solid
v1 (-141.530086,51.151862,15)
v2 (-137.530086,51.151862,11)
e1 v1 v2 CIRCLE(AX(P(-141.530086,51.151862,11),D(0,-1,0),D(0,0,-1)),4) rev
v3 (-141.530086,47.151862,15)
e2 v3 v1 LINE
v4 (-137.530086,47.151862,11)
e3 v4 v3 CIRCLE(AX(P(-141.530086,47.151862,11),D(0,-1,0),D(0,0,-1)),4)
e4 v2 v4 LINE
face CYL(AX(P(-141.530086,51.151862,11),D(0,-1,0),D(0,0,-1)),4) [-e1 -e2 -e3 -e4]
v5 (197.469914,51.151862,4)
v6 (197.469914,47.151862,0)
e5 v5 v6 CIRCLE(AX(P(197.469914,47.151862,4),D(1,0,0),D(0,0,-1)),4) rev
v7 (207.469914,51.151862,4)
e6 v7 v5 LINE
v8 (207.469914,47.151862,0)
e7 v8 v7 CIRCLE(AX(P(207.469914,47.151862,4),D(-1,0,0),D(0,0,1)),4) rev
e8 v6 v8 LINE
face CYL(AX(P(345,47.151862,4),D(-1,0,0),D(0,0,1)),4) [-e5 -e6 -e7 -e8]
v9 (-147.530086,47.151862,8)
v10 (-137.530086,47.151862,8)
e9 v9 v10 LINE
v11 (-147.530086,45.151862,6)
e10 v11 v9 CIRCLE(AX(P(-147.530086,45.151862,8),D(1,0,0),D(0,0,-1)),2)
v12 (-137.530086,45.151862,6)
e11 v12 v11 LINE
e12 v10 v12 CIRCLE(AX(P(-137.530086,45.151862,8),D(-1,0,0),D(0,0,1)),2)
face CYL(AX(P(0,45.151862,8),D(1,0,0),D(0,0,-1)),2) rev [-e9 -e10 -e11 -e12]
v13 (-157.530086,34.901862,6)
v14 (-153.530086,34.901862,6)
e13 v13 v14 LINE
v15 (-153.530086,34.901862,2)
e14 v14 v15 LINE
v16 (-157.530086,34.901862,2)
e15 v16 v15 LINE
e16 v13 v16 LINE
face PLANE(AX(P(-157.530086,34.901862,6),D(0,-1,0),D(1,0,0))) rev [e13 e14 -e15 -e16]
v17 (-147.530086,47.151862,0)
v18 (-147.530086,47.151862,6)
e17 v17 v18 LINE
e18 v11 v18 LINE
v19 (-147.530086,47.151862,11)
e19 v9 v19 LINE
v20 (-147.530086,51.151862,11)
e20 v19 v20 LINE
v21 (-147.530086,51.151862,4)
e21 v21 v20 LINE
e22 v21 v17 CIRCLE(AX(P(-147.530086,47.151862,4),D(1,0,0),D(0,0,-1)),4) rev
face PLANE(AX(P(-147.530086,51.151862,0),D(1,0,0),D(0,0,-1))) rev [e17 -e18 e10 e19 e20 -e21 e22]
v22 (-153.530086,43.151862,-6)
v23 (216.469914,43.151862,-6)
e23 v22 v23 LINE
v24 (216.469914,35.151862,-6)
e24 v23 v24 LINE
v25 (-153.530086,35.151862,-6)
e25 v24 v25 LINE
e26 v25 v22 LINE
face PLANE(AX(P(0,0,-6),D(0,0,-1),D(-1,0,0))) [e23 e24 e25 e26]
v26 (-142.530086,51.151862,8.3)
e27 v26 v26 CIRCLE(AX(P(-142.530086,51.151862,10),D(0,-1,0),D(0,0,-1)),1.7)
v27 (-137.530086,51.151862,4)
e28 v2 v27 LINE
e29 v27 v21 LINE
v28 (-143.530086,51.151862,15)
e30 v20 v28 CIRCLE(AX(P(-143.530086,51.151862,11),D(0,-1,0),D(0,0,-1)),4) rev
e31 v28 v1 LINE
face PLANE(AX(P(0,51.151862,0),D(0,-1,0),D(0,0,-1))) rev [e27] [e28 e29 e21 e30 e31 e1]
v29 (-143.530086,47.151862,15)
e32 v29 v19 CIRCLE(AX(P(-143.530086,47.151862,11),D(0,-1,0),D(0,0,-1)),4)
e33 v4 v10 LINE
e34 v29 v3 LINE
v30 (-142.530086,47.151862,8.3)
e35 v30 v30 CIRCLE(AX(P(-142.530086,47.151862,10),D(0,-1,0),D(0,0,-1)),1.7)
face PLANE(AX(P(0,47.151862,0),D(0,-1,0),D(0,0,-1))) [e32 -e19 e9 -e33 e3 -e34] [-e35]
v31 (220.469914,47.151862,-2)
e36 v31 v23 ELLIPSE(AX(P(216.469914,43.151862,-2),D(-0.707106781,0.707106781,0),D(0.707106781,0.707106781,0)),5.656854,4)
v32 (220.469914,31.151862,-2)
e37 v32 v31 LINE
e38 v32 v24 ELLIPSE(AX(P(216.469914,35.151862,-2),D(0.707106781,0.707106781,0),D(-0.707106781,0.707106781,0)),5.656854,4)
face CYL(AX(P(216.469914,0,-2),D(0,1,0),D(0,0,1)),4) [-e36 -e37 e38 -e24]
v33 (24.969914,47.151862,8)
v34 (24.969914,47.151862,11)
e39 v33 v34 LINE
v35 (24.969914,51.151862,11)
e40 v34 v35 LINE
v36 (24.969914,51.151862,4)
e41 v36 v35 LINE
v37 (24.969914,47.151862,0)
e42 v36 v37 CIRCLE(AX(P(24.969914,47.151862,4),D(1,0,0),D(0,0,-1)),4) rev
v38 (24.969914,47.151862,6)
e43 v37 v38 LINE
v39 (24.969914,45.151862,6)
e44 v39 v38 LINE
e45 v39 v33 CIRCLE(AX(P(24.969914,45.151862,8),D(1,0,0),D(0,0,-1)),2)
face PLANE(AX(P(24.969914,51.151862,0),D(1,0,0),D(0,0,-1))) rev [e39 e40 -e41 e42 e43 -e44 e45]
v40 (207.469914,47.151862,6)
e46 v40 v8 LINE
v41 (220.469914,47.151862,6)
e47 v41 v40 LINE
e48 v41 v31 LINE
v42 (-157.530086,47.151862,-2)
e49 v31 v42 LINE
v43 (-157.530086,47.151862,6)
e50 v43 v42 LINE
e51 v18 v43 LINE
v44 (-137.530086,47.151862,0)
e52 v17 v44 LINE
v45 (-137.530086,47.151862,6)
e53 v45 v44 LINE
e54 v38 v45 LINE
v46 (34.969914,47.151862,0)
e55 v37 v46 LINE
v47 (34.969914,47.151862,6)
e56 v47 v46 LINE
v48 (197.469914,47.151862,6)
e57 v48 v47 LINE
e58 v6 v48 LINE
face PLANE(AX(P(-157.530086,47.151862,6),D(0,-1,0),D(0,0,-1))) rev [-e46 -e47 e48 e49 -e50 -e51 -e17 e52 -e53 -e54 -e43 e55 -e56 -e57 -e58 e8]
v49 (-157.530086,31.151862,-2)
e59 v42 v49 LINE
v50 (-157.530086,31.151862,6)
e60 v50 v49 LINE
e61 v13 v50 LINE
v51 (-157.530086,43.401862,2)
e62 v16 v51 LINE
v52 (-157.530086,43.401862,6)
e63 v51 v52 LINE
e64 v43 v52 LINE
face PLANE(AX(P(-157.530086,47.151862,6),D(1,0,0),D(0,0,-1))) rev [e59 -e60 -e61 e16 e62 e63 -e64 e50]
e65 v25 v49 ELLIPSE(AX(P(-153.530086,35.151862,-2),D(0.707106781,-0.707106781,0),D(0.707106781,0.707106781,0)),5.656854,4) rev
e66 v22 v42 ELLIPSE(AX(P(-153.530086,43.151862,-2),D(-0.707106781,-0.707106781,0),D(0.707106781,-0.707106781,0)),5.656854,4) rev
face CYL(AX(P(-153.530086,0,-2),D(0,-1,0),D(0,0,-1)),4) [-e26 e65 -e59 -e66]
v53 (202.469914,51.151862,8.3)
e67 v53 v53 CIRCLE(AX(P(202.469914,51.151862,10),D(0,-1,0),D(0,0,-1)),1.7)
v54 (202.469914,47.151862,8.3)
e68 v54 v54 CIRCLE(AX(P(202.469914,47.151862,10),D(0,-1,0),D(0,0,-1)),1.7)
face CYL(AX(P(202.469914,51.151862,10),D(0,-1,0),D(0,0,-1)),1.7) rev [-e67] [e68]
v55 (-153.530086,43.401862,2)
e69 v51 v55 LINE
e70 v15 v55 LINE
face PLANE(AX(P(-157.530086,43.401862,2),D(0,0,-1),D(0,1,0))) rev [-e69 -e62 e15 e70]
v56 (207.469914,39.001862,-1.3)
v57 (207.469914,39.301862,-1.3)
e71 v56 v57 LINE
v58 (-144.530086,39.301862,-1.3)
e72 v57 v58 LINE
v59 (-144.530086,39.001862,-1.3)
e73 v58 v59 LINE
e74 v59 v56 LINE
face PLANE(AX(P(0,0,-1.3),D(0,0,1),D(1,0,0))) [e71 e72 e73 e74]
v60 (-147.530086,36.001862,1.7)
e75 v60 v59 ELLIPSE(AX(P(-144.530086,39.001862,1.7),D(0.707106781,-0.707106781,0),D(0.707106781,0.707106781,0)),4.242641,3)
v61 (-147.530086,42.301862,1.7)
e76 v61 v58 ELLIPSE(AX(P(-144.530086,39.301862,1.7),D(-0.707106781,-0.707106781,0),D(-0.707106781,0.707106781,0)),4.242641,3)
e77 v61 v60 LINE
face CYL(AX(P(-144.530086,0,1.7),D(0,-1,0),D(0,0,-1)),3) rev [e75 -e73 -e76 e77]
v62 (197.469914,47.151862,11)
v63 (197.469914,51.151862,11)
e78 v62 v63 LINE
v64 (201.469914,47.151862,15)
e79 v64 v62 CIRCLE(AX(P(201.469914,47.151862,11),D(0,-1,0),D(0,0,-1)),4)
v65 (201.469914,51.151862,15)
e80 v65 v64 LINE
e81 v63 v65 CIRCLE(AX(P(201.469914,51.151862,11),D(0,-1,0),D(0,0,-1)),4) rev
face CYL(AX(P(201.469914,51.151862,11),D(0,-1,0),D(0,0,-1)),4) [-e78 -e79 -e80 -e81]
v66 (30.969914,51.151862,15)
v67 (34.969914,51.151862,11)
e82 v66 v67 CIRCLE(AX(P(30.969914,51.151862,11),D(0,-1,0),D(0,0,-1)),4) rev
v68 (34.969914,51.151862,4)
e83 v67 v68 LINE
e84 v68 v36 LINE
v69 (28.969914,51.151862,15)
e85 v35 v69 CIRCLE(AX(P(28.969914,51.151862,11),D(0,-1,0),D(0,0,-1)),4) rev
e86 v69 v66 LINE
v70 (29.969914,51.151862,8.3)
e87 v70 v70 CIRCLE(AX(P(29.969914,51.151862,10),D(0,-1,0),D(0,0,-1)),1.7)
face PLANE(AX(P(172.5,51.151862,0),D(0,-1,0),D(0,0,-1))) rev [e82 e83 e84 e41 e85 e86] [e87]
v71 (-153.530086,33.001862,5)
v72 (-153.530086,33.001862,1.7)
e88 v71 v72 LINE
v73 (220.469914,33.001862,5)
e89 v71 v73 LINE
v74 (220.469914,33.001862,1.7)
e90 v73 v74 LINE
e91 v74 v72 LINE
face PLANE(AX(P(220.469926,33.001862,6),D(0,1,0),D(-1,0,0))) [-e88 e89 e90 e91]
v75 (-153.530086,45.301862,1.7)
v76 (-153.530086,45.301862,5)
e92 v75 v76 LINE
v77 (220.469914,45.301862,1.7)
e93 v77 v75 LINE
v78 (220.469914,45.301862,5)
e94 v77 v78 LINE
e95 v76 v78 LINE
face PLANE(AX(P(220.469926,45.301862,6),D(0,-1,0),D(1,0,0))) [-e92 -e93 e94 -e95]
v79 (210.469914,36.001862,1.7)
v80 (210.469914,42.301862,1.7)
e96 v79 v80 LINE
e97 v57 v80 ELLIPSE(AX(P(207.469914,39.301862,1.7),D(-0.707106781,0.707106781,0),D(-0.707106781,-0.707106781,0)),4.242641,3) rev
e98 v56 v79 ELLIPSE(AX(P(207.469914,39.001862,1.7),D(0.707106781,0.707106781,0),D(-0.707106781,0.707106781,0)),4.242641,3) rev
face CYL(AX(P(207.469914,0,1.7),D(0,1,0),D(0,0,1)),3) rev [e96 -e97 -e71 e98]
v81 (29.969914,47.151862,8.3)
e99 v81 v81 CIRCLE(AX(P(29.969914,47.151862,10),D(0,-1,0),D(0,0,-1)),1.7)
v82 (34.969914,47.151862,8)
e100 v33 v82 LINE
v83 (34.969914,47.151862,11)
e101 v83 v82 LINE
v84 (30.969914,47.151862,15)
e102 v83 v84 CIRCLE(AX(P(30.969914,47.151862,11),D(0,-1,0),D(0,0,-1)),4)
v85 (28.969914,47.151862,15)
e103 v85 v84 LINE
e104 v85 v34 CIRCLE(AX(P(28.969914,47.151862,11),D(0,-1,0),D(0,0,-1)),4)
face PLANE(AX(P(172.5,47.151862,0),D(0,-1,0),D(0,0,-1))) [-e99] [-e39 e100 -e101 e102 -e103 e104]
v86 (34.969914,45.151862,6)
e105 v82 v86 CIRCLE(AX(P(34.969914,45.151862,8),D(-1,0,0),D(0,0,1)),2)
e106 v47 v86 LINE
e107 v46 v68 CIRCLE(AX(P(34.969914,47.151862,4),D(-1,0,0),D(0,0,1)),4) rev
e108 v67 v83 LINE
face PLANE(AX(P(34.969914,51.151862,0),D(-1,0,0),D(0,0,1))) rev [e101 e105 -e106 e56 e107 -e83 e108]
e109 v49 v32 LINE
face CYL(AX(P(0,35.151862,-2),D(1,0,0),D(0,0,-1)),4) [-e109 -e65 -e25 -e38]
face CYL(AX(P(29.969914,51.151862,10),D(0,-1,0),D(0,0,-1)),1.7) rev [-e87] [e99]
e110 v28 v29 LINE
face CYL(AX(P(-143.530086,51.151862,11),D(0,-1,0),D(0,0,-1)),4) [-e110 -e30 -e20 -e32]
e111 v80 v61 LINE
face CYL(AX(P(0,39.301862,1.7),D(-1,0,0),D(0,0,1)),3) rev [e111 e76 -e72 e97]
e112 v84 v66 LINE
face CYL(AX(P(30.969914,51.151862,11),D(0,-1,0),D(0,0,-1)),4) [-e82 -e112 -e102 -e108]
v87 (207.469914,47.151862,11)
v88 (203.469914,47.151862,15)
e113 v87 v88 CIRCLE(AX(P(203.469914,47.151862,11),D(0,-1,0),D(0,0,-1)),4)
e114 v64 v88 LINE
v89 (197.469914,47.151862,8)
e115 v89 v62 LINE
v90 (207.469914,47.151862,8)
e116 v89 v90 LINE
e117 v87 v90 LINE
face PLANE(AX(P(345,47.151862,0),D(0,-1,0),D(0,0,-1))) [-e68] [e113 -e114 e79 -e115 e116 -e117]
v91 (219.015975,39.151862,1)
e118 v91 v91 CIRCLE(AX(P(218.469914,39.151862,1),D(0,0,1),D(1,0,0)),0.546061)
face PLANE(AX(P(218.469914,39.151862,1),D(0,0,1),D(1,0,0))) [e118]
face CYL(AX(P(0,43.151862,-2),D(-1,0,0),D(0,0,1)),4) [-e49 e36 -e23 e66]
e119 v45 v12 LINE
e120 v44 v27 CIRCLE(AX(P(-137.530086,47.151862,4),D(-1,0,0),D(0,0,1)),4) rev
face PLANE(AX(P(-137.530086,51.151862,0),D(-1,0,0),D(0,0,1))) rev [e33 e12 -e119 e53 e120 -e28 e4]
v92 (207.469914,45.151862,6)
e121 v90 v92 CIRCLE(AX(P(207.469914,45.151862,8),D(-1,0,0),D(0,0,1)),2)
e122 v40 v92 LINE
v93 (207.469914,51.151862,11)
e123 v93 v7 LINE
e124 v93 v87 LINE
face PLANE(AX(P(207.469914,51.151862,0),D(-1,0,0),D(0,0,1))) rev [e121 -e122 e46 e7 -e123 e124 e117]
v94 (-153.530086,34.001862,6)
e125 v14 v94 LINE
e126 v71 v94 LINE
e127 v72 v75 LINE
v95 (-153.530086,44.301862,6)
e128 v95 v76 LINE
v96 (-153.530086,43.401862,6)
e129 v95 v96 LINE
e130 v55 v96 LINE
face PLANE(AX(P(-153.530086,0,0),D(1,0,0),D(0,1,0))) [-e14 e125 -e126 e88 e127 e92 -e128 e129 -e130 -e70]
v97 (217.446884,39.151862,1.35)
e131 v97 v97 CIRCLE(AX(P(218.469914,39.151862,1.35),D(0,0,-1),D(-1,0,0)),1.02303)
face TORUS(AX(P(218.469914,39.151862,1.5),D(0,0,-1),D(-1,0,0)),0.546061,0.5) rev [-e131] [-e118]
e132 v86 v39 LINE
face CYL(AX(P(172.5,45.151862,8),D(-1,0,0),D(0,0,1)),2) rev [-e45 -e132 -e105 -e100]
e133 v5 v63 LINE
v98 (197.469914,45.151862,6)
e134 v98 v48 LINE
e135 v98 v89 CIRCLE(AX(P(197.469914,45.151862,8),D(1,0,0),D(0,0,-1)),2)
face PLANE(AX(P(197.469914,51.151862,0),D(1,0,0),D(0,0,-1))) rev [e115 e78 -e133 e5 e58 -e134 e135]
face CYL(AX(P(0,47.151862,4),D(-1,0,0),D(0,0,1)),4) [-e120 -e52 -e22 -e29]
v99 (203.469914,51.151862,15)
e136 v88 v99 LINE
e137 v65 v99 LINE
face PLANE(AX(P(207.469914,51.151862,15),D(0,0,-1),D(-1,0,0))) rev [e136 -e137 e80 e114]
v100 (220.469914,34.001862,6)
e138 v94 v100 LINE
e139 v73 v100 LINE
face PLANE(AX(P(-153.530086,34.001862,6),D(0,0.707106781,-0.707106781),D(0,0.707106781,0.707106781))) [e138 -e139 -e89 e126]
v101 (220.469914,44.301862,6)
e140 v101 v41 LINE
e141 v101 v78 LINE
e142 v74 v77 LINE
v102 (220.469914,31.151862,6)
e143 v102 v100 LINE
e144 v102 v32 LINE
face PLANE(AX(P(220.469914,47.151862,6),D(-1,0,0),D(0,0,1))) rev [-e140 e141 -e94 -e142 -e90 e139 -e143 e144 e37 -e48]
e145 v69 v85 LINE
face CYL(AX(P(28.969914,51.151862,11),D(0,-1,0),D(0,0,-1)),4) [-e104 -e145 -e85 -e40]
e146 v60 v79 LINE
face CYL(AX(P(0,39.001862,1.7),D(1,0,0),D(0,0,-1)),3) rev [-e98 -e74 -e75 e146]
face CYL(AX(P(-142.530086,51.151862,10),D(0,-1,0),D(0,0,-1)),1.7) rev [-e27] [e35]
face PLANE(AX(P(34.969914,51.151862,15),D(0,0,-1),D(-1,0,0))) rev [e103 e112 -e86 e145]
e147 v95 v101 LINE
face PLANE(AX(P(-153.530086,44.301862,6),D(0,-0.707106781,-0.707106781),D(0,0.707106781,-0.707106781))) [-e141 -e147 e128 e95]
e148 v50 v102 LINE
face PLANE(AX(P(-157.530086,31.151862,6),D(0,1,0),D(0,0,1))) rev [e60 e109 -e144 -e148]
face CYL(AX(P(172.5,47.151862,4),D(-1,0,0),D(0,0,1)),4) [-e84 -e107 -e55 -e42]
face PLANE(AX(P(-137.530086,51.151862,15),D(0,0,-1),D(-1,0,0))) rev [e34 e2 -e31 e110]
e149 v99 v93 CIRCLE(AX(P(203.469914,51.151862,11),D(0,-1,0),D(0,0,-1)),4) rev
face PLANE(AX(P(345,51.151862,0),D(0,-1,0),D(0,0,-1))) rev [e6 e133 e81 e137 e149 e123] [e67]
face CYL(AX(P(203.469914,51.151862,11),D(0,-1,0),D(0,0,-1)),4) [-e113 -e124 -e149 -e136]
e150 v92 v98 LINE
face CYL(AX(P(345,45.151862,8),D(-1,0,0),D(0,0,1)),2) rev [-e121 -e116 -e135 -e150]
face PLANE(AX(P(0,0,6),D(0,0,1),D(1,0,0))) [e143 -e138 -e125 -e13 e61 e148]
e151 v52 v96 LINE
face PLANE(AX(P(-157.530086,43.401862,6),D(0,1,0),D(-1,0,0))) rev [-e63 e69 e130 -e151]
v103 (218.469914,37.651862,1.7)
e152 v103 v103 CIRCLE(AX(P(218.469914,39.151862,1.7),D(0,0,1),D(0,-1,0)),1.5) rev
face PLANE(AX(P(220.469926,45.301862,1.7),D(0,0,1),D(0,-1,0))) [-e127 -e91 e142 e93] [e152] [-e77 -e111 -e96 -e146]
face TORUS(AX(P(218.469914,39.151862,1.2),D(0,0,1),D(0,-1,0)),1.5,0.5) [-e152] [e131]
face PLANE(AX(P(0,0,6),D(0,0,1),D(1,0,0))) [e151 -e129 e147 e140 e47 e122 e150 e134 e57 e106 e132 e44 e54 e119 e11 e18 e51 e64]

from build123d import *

# Parameters (mm, degrees)
SKETCH1_W               = 378
SKETCH1_H               = 16
BOSS_EXTRUDE1_DEPTH     = 6
CUT_EXTRUDE1_DEPTH      = 381.976768496
CUT_EXTRUDE1_DEPTH_BACK = 374
SKETCH3_W               = 4.3
SKETCH3_H               = 12.3
BOSS_EXTRUDE2_DEPTH     = 374
BOSS_EXTRUDE3_DEPTH     = 374
SKETCH6_W               = 4
SKETCH6_H               = 8.5
CUT_EXTRUDE2_DEPTH      = 378.00835287
SKETCH13_W              = 10
SKETCH13_H              = 15
BOSS_EXTRUDE5_DEPTH     = 4
FILLET10_R              = 4
SKETCH14_R              = 1.7
CUT_EXTRUDE5_DEPTH      = 4
FILLET11_R              = 4
FILLET12_R              = 4
LPATTERN3_COUNT         = 3
LPATTERN3_PITCH         = 172.5
LPATTERN4_COUNT         = 3
LPATTERN4_PITCH         = 172.5
FILLET13_R              = 4
FILLET14_R              = 4
FILLET16_R              = 4
FILLET17_R              = 4
FILLET18_R              = 4
FILLET19_R              = 4
FILLET20_R              = 2
FILLET21_R              = 2
FILLET22_R              = 2
SKETCH17_W              = 378
SKETCH17_H              = 16
BOSS_EXTRUDE6_DEPTH     = 6
FILLET25_R              = 4
SKETCH18_R              = 1
CUT_EXTRUDE6_DEPTH      = 0.7
FILLET26_R              = 0.5
FILLET27_R              = 0.5
SKETCH19_W              = 358
SKETCH19_H              = 6.3
CUT_EXTRUDE7_DEPTH      = 3
FILLET28_R              = 3


with BuildPart() as part:
    # Sketch1 → Boss-Extrude1 (new body)
    with BuildSketch(Plane.XY):
        with Locations((31.46991404, 39.151862464)):
            Rectangle(SKETCH1_W, SKETCH1_H)
    extrude(amount=BOSS_EXTRUDE1_DEPTH)

    # Sketch3 → Cut-Extrude1 (cut, two sides: drawn at the far end of the back side and taken through both)
    with BuildSketch(Plane(origin=(220.46991404, 0, 0), x_dir=(0, 0, -1), z_dir=(1, 0, 0)).offset(-CUT_EXTRUDE1_DEPTH_BACK)):
        with Locations((-3.85, 39.151862464)):
            Rectangle(SKETCH3_W, SKETCH3_H)
    extrude(amount=CUT_EXTRUDE1_DEPTH + CUT_EXTRUDE1_DEPTH_BACK, mode=Mode.SUBTRACT)

    # Sketch4 → Boss-Extrude2 (add)
    with BuildSketch(Plane(origin=(220.46991404, 0, 0), x_dir=(0, 0, -1), z_dir=(1, 0, 0))):
        Polygon((-6, 33.001862464), (-6, 34.001862464), (-5, 33.001862464), align=None)
    extrude(amount=-BOSS_EXTRUDE2_DEPTH)

    # Sketch5 → Boss-Extrude3 (add)
    with BuildSketch(Plane(origin=(220.46991404, 0, 0), x_dir=(0, 0, -1), z_dir=(1, 0, 0))):
        Polygon((-6, 45.301862464), (-6, 44.301862464), (-5, 45.301862464), align=None)
    extrude(amount=-BOSS_EXTRUDE3_DEPTH)

    # Sketch6 → Cut-Extrude2 (cut, through all)
    with BuildSketch(Plane(origin=(-153.53008596, 0, 0), x_dir=(0, 0, -1), z_dir=(1, 0, 0))):
        with Locations((-4, 39.151862464)):
            Rectangle(SKETCH6_W, SKETCH6_H)
    extrude(amount=-CUT_EXTRUDE2_DEPTH, mode=Mode.SUBTRACT)

    # Sketch13 → Boss-Extrude5 (add)
    with BuildSketch(Plane(origin=(0, 47.151862464, 0), x_dir=(1, 0, 0), z_dir=(0, 1, 0))):
        with Locations((-142.53008596, -7.5)):
            Rectangle(SKETCH13_W, SKETCH13_H)
    boss_extrude5 = extrude(amount=BOSS_EXTRUDE5_DEPTH)

    # Fillet10
    fillet10_edges = [part.edges().sort_by_distance(p)[0] for p in [
        (-142.53008596, 51.151862464, 0),
    ]]
    fillet(fillet10_edges, radius=FILLET10_R)

    # Sketch14 → Cut-Extrude5 (cut)
    with BuildSketch(Plane.XZ.offset(-47.151862464)):
        with Locations(Location((-142.53008596, 10, 0), (0, 0, 270))):
            Circle(SKETCH14_R)
    cut_extrude5 = extrude(amount=-CUT_EXTRUDE5_DEPTH, mode=Mode.SUBTRACT)

    # Fillet11
    fillet11_edges = [part.edges().sort_by_distance(p)[0] for p in [
        (-137.53008596, 49.151862464, 15),
    ]]
    fillet(fillet11_edges, radius=FILLET11_R)

    # Fillet12
    fillet12_edges = [part.edges().sort_by_distance(p)[0] for p in [
        (-147.53008596, 49.151862464, 15),
    ]]
    fillet(fillet12_edges, radius=FILLET12_R)

    # LPattern3: Boss-Extrude5 ×3
    with Locations(*[(i * LPATTERN3_PITCH, 0, 0) for i in range(1, LPATTERN3_COUNT)]):
        add(boss_extrude5)

    # LPattern4: Cut-Extrude5 ×3
    with Locations(*[(i * LPATTERN4_PITCH, 0, 0) for i in range(1, LPATTERN4_COUNT)]):
        add(cut_extrude5, mode=Mode.SUBTRACT)

    # Fillet13
    fillet13_edges = [part.edges().sort_by_distance(p)[0] for p in [
        (29.96991404, 51.151862464, 0),
    ]]
    fillet(fillet13_edges, radius=FILLET13_R)

    # Fillet14
    fillet14_edges = [part.edges().sort_by_distance(p)[0] for p in [
        (202.46991404, 51.151862464, 0),
    ]]
    fillet(fillet14_edges, radius=FILLET14_R)

    # Fillet16
    fillet16_edges = [part.edges().sort_by_distance(p)[0] for p in [
        (24.96991404, 49.151862464, 15),
    ]]
    fillet(fillet16_edges, radius=FILLET16_R)

    # Fillet17
    fillet17_edges = [part.edges().sort_by_distance(p)[0] for p in [
        (34.96991404, 49.151862464, 15),
    ]]
    fillet(fillet17_edges, radius=FILLET17_R)

    # Fillet18
    fillet18_edges = [part.edges().sort_by_distance(p)[0] for p in [
        (207.46991404, 49.151862464, 15),
    ]]
    fillet(fillet18_edges, radius=FILLET18_R)

    # Fillet19
    fillet19_edges = [part.edges().sort_by_distance(p)[0] for p in [
        (197.46991404, 49.151862464, 15),
    ]]
    fillet(fillet19_edges, radius=FILLET19_R)

    # Fillet20
    fillet20_edges = [part.edges().sort_by_distance(p)[0] for p in [
        (202.46991404, 47.151862464, 6),
    ]]
    fillet(fillet20_edges, radius=FILLET20_R)

    # Fillet21
    fillet21_edges = [part.edges().sort_by_distance(p)[0] for p in [
        (29.96991404, 47.151862464, 6),
    ]]
    fillet(fillet21_edges, radius=FILLET21_R)

    # Fillet22
    fillet22_edges = [part.edges().sort_by_distance(p)[0] for p in [
        (-142.53008596, 47.151862464, 6),
    ]]
    fillet(fillet22_edges, radius=FILLET22_R)

    # Sketch17 → Boss-Extrude6 (add)
    with BuildSketch(Plane(origin=(0, 0, 0), x_dir=(-1, 0, 0), z_dir=(0, 0, -1))):
        with Locations((-31.46991404, 39.151862464)):
            Rectangle(SKETCH17_W, SKETCH17_H)
    extrude(amount=BOSS_EXTRUDE6_DEPTH)

    # Fillet25
    fillet25_edges = [part.edges().sort_by_distance(p)[0] for p in [
        (220.46991404, 39.151862464, -6),
        (31.46991404, 31.151862464, -6),
        (-157.53008596, 39.151862464, -6),
        (31.46991404, 47.151862464, -6),
    ]]
    fillet(fillet25_edges, radius=FILLET25_R)

    # Sketch18 → Cut-Extrude6 (cut)
    with BuildSketch(Plane.XY.offset(1.7)):
        with Locations((218.46991404, 39.151862464)):
            Circle(SKETCH18_R)
    extrude(amount=-CUT_EXTRUDE6_DEPTH, mode=Mode.SUBTRACT)

    # Fillet26
    fillet26_edges = [part.edges().sort_by_distance(p)[0] for p in [
        (217.46991404, 39.151862464, 1.7),
    ]]
    fillet(fillet26_edges, radius=FILLET26_R)

    # Fillet27
    fillet27_edges = [part.edges().sort_by_distance(p)[0] for p in [
        (217.46991404, 39.151862464, 1),
    ]]
    fillet(fillet27_edges, radius=FILLET27_R)

    # Sketch19 → Cut-Extrude7 (cut)
    with BuildSketch(Plane.XY.offset(1.7)):
        with Locations((31.46991404, 39.151862464)):
            Rectangle(SKETCH19_W, SKETCH19_H)
    extrude(amount=-CUT_EXTRUDE7_DEPTH, mode=Mode.SUBTRACT)

    # Fillet28
    fillet28_edges = [part.edges().sort_by_distance(p)[0] for p in [
        (31.46991404, 42.301862464, -1.3),
        (210.46991404, 39.151862464, -1.3),
        (31.46991404, 36.001862464, -1.3),
        (-147.53008596, 39.151862464, -1.3),
    ]]
    fillet(fillet28_edges, radius=FILLET28_R - 0.0001)  # a hair under: the kernel refuses the full size


solid = part.part
